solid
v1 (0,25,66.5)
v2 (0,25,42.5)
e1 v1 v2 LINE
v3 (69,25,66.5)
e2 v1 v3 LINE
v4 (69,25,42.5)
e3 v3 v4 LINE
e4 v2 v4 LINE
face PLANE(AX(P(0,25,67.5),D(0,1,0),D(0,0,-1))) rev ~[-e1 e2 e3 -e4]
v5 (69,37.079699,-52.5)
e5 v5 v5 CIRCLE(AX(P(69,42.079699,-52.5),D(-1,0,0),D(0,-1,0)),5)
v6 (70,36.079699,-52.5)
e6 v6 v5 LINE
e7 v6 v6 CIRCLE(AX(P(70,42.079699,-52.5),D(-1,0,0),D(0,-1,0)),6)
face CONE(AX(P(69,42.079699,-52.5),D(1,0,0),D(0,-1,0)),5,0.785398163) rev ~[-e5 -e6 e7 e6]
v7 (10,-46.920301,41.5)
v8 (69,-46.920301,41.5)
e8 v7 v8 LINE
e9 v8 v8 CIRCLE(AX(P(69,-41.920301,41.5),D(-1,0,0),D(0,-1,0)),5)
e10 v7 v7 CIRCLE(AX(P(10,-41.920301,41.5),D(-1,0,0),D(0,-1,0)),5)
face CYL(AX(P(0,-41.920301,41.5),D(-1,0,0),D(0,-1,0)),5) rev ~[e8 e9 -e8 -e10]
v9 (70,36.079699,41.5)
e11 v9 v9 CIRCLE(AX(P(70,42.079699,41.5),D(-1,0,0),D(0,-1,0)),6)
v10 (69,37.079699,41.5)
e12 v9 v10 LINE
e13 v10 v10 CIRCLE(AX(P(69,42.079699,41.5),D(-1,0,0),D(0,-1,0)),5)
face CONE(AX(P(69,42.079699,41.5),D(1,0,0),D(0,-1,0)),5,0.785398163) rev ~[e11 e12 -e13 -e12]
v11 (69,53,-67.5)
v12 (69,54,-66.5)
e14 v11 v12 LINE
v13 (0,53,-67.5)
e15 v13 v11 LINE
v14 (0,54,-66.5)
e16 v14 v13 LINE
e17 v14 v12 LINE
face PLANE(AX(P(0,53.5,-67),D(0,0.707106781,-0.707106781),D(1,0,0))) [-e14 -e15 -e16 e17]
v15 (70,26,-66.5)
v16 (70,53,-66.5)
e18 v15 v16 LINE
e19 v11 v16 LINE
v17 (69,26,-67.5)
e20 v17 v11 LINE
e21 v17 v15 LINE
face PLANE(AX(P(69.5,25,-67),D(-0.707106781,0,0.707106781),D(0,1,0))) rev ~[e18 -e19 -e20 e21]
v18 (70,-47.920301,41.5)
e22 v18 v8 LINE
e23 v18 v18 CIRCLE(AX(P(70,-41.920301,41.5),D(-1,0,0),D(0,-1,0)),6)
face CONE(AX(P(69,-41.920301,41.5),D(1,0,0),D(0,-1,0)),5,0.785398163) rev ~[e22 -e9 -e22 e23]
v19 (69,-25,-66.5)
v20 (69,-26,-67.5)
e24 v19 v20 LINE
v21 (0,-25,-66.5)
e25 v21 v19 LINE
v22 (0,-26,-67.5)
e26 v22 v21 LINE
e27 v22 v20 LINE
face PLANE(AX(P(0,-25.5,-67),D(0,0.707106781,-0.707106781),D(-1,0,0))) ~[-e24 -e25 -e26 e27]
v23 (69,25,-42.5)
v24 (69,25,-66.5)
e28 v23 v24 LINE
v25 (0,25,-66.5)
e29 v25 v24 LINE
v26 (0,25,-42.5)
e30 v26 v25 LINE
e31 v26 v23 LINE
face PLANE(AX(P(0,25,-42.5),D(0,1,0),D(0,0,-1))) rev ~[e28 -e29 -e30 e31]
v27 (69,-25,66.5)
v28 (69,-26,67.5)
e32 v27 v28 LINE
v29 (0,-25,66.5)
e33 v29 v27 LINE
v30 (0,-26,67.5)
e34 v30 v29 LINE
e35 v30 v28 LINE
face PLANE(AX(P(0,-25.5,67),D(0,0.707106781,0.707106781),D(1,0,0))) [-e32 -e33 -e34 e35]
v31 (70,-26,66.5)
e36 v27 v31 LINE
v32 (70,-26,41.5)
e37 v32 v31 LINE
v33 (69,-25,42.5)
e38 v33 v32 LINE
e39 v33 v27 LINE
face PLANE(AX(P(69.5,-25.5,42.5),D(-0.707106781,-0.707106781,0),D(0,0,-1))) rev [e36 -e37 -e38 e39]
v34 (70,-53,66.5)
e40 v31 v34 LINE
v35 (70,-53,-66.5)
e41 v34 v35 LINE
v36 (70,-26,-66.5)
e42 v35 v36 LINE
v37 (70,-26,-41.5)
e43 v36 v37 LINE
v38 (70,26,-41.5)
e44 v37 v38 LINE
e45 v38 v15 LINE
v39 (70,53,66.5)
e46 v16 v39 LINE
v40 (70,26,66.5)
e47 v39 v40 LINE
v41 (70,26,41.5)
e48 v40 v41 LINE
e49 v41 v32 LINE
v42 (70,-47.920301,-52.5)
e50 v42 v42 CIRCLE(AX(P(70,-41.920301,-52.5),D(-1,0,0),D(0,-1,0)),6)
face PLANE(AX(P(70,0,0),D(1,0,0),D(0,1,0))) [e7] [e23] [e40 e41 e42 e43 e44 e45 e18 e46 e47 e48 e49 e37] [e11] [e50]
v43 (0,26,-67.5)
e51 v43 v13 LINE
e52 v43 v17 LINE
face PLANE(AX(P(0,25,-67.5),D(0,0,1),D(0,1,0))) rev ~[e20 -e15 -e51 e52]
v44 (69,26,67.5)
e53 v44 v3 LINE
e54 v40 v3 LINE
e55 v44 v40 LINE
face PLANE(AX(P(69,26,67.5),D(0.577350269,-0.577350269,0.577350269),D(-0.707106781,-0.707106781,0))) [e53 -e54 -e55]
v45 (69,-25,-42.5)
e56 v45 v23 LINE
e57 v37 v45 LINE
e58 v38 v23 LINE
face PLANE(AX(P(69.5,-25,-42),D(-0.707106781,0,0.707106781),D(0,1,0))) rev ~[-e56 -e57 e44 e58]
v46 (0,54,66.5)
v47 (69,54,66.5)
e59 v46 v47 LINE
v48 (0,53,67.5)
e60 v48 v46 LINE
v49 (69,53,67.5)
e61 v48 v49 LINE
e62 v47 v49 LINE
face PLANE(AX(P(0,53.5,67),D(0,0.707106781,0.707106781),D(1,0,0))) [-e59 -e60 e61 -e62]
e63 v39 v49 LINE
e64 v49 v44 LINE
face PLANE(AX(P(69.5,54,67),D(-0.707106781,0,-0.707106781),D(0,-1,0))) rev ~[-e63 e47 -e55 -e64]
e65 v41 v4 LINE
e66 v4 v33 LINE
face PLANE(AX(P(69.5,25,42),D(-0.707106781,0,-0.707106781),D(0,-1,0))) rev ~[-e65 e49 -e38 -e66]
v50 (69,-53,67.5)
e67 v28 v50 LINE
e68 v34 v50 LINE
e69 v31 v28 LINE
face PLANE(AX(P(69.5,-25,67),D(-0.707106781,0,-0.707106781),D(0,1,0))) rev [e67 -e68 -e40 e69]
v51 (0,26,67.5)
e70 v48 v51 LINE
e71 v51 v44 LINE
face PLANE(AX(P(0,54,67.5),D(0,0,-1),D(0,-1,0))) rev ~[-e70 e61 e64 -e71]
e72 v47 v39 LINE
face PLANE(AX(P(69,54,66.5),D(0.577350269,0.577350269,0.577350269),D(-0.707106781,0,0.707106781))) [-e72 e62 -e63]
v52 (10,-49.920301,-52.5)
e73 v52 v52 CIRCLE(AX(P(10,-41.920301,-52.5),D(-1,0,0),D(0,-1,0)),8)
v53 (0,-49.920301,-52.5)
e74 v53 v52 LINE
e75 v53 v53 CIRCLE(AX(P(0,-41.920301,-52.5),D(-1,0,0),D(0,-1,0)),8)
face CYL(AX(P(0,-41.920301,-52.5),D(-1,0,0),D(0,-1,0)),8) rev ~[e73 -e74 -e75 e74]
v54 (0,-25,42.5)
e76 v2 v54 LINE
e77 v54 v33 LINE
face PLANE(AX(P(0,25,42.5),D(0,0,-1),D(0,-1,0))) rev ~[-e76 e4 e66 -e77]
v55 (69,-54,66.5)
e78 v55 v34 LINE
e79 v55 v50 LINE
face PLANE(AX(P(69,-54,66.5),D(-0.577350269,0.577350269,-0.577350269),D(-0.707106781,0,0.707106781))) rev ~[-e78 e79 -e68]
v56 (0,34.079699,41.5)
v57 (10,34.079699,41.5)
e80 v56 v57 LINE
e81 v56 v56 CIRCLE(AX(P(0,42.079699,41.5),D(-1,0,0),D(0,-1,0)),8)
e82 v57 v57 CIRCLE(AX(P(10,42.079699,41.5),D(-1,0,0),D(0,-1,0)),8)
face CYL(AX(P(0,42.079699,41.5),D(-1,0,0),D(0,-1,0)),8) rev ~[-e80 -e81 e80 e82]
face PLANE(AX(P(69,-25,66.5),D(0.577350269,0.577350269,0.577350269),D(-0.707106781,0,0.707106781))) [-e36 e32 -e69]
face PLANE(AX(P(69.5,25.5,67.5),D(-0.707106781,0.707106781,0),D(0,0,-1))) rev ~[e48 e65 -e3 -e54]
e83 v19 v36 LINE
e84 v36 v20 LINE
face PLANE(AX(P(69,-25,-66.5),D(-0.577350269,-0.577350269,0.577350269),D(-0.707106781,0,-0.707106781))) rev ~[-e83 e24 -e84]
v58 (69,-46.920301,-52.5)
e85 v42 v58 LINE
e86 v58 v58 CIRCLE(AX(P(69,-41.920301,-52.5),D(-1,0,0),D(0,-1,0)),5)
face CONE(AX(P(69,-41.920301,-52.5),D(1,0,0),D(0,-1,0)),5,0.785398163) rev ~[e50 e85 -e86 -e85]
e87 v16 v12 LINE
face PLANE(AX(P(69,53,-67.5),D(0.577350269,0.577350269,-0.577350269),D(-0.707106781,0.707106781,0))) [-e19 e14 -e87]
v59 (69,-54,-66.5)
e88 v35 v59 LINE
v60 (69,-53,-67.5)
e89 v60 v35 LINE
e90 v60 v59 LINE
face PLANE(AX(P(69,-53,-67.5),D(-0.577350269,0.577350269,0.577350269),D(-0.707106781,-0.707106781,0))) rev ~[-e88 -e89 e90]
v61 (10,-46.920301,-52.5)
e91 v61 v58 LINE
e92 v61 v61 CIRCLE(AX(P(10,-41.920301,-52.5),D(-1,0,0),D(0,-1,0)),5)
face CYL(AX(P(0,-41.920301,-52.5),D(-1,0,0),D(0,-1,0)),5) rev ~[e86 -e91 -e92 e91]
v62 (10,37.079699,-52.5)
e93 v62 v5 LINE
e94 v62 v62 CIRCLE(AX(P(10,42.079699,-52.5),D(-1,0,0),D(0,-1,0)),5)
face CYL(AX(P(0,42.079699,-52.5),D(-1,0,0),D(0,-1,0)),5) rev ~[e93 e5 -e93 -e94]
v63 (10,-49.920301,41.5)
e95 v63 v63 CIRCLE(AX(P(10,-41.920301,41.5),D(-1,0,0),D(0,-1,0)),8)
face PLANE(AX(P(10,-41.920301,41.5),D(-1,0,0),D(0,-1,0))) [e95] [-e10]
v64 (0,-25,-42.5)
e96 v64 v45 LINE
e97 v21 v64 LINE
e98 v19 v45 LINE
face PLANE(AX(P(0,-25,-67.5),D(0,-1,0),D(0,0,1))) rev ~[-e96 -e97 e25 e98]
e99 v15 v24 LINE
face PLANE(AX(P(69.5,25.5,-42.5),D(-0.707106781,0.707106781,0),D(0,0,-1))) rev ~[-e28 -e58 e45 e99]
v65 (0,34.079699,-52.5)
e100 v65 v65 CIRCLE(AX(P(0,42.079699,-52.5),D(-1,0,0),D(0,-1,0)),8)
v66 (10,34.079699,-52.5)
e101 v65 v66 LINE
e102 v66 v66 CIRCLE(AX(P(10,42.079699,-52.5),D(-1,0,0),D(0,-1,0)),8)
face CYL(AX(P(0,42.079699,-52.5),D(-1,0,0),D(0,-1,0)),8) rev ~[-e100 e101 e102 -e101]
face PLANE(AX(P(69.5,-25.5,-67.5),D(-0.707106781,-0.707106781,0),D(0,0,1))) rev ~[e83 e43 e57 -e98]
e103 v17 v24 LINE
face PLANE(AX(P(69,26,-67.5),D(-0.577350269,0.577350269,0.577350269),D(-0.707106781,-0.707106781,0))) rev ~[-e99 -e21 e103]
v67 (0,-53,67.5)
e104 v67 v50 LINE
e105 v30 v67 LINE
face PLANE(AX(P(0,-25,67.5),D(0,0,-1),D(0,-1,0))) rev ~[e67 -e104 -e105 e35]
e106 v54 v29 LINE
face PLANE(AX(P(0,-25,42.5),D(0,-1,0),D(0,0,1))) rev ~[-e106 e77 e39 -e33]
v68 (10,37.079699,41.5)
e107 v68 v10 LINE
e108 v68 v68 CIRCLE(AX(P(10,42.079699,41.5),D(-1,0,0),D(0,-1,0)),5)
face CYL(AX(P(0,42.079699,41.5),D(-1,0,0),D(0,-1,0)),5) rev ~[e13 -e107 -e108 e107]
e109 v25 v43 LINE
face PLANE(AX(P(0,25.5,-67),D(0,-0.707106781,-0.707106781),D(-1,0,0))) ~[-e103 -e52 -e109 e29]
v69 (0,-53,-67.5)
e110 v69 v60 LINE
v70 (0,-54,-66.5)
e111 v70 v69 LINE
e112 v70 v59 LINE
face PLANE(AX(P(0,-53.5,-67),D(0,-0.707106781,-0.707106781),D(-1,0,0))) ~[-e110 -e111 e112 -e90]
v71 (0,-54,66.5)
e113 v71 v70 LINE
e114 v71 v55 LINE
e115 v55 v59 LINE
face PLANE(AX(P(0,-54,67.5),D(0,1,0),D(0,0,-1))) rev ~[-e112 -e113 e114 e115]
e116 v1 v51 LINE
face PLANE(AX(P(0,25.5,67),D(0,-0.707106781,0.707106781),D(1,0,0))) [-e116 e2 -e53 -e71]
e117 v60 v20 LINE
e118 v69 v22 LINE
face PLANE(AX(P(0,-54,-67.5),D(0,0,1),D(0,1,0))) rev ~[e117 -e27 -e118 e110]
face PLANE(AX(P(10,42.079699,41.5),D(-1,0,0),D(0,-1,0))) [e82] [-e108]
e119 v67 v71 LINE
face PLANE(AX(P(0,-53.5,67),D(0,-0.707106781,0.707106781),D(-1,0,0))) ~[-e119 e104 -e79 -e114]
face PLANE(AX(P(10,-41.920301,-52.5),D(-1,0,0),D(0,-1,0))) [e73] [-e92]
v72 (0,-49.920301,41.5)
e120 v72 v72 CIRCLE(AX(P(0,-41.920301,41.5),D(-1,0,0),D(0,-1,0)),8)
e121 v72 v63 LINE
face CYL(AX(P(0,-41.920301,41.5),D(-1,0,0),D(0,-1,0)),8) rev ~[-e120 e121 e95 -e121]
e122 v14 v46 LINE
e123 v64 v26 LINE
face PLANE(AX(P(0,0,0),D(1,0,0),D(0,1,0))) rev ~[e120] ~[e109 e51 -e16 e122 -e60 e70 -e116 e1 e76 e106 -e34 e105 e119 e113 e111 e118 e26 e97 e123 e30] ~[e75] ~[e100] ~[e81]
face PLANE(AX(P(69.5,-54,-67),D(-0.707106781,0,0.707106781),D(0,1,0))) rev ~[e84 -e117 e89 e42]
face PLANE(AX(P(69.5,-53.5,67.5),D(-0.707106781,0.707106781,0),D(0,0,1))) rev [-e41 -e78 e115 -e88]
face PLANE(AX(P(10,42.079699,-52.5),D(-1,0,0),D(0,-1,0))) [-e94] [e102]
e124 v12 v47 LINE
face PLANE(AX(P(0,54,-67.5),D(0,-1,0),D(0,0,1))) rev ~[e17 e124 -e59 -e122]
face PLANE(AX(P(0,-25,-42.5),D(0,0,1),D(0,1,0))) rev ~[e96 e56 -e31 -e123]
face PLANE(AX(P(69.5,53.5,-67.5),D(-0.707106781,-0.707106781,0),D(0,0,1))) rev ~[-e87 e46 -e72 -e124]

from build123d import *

# Parameters (mm, degrees)
F1_DEPTH = 70
F2_R     = 8
F3_DEPTH = 10
F4_R     = 5
F5_DEPTH = 70.001
F6_SIZE  = 1


# Not quite as in the source:
# - a feature names something its author has since deleted; it is built from what else it names


with BuildPart() as f1:
    # F0 (on Right) → F1 (new body)
    with BuildSketch(Plane.YZ):
        Polygon((-25, 67.5), (-54, 67.5), (-54, -67.5), (-25, -67.5), (-25, -42.5), (25, -42.5), (25, -67.5), (54, -67.5), (54, 67.5), (25, 67.5), (25, 42.5), (-25, 42.5), align=None)
    extrude(amount=F1_DEPTH)

    # F2 (on face) → F3 (cut)
    with BuildSketch(Plane(origin=(0, 0, 0), x_dir=(0, -1, 0), z_dir=(-1, 0, 0))):
        with Locations((41.9203005731, 41.5)):
            Circle(F2_R)
        with Locations((-42.0796994269, 41.5)):
            Circle(F2_R)
        with Locations((41.9203005731, -52.5)):
            Circle(F2_R)
        with Locations((-42.0796994269, -52.5)):
            Circle(F2_R)
    extrude(amount=-F3_DEPTH, mode=Mode.SUBTRACT)

    # F4 (on face) → F5 (cut, through all)
    with BuildSketch(Plane(origin=(0, 0, 0), x_dir=(0, -1, 0), z_dir=(-1, 0, 0))):
        with Locations((-42.0796994269, 41.5)):
            Circle(F4_R)
        with Locations((41.9203005731, 41.5)):
            Circle(F4_R)
        with Locations((41.9203005731, -52.5)):
            Circle(F4_R)
        with Locations((-42.0796994269, -52.5)):
            Circle(F4_R)
    extrude(amount=-F5_DEPTH, mode=Mode.SUBTRACT)

    # F6
    f6_edges = [f1.edges().sort_by_distance(p)[0] for p in [
        (70, -39.5, 67.5),
        (70, -25, 55),
        (70, -54, 0),
        (70, 0, 42.5),
        (70, -39.5, -67.5),
        (70, 25, 55),
        (70, -25, -55),
        (70, 39.5, 67.5),
        (70, 0, -42.5),
        (70, 54, 0),
        (70, 25, -55),
        (70, 39.5, -67.5),
        (70, -36.920301, -52.5),
        (70, 47.079699, -52.5),
        (70, -36.920301, 41.5),
        (70, 47.079699, 41.5),
        (35, -54, -67.5),
        (35, -25, -67.5),
        (35, 25, -67.5),
        (35, 54, -67.5),
        (35, -54, 67.5),
        (35, -25, 67.5),
        (35, 25, 67.5),
        (35, 54, 67.5),
    ]]
    chamfer(f6_edges, length=F6_SIZE)


solid = f1.part
